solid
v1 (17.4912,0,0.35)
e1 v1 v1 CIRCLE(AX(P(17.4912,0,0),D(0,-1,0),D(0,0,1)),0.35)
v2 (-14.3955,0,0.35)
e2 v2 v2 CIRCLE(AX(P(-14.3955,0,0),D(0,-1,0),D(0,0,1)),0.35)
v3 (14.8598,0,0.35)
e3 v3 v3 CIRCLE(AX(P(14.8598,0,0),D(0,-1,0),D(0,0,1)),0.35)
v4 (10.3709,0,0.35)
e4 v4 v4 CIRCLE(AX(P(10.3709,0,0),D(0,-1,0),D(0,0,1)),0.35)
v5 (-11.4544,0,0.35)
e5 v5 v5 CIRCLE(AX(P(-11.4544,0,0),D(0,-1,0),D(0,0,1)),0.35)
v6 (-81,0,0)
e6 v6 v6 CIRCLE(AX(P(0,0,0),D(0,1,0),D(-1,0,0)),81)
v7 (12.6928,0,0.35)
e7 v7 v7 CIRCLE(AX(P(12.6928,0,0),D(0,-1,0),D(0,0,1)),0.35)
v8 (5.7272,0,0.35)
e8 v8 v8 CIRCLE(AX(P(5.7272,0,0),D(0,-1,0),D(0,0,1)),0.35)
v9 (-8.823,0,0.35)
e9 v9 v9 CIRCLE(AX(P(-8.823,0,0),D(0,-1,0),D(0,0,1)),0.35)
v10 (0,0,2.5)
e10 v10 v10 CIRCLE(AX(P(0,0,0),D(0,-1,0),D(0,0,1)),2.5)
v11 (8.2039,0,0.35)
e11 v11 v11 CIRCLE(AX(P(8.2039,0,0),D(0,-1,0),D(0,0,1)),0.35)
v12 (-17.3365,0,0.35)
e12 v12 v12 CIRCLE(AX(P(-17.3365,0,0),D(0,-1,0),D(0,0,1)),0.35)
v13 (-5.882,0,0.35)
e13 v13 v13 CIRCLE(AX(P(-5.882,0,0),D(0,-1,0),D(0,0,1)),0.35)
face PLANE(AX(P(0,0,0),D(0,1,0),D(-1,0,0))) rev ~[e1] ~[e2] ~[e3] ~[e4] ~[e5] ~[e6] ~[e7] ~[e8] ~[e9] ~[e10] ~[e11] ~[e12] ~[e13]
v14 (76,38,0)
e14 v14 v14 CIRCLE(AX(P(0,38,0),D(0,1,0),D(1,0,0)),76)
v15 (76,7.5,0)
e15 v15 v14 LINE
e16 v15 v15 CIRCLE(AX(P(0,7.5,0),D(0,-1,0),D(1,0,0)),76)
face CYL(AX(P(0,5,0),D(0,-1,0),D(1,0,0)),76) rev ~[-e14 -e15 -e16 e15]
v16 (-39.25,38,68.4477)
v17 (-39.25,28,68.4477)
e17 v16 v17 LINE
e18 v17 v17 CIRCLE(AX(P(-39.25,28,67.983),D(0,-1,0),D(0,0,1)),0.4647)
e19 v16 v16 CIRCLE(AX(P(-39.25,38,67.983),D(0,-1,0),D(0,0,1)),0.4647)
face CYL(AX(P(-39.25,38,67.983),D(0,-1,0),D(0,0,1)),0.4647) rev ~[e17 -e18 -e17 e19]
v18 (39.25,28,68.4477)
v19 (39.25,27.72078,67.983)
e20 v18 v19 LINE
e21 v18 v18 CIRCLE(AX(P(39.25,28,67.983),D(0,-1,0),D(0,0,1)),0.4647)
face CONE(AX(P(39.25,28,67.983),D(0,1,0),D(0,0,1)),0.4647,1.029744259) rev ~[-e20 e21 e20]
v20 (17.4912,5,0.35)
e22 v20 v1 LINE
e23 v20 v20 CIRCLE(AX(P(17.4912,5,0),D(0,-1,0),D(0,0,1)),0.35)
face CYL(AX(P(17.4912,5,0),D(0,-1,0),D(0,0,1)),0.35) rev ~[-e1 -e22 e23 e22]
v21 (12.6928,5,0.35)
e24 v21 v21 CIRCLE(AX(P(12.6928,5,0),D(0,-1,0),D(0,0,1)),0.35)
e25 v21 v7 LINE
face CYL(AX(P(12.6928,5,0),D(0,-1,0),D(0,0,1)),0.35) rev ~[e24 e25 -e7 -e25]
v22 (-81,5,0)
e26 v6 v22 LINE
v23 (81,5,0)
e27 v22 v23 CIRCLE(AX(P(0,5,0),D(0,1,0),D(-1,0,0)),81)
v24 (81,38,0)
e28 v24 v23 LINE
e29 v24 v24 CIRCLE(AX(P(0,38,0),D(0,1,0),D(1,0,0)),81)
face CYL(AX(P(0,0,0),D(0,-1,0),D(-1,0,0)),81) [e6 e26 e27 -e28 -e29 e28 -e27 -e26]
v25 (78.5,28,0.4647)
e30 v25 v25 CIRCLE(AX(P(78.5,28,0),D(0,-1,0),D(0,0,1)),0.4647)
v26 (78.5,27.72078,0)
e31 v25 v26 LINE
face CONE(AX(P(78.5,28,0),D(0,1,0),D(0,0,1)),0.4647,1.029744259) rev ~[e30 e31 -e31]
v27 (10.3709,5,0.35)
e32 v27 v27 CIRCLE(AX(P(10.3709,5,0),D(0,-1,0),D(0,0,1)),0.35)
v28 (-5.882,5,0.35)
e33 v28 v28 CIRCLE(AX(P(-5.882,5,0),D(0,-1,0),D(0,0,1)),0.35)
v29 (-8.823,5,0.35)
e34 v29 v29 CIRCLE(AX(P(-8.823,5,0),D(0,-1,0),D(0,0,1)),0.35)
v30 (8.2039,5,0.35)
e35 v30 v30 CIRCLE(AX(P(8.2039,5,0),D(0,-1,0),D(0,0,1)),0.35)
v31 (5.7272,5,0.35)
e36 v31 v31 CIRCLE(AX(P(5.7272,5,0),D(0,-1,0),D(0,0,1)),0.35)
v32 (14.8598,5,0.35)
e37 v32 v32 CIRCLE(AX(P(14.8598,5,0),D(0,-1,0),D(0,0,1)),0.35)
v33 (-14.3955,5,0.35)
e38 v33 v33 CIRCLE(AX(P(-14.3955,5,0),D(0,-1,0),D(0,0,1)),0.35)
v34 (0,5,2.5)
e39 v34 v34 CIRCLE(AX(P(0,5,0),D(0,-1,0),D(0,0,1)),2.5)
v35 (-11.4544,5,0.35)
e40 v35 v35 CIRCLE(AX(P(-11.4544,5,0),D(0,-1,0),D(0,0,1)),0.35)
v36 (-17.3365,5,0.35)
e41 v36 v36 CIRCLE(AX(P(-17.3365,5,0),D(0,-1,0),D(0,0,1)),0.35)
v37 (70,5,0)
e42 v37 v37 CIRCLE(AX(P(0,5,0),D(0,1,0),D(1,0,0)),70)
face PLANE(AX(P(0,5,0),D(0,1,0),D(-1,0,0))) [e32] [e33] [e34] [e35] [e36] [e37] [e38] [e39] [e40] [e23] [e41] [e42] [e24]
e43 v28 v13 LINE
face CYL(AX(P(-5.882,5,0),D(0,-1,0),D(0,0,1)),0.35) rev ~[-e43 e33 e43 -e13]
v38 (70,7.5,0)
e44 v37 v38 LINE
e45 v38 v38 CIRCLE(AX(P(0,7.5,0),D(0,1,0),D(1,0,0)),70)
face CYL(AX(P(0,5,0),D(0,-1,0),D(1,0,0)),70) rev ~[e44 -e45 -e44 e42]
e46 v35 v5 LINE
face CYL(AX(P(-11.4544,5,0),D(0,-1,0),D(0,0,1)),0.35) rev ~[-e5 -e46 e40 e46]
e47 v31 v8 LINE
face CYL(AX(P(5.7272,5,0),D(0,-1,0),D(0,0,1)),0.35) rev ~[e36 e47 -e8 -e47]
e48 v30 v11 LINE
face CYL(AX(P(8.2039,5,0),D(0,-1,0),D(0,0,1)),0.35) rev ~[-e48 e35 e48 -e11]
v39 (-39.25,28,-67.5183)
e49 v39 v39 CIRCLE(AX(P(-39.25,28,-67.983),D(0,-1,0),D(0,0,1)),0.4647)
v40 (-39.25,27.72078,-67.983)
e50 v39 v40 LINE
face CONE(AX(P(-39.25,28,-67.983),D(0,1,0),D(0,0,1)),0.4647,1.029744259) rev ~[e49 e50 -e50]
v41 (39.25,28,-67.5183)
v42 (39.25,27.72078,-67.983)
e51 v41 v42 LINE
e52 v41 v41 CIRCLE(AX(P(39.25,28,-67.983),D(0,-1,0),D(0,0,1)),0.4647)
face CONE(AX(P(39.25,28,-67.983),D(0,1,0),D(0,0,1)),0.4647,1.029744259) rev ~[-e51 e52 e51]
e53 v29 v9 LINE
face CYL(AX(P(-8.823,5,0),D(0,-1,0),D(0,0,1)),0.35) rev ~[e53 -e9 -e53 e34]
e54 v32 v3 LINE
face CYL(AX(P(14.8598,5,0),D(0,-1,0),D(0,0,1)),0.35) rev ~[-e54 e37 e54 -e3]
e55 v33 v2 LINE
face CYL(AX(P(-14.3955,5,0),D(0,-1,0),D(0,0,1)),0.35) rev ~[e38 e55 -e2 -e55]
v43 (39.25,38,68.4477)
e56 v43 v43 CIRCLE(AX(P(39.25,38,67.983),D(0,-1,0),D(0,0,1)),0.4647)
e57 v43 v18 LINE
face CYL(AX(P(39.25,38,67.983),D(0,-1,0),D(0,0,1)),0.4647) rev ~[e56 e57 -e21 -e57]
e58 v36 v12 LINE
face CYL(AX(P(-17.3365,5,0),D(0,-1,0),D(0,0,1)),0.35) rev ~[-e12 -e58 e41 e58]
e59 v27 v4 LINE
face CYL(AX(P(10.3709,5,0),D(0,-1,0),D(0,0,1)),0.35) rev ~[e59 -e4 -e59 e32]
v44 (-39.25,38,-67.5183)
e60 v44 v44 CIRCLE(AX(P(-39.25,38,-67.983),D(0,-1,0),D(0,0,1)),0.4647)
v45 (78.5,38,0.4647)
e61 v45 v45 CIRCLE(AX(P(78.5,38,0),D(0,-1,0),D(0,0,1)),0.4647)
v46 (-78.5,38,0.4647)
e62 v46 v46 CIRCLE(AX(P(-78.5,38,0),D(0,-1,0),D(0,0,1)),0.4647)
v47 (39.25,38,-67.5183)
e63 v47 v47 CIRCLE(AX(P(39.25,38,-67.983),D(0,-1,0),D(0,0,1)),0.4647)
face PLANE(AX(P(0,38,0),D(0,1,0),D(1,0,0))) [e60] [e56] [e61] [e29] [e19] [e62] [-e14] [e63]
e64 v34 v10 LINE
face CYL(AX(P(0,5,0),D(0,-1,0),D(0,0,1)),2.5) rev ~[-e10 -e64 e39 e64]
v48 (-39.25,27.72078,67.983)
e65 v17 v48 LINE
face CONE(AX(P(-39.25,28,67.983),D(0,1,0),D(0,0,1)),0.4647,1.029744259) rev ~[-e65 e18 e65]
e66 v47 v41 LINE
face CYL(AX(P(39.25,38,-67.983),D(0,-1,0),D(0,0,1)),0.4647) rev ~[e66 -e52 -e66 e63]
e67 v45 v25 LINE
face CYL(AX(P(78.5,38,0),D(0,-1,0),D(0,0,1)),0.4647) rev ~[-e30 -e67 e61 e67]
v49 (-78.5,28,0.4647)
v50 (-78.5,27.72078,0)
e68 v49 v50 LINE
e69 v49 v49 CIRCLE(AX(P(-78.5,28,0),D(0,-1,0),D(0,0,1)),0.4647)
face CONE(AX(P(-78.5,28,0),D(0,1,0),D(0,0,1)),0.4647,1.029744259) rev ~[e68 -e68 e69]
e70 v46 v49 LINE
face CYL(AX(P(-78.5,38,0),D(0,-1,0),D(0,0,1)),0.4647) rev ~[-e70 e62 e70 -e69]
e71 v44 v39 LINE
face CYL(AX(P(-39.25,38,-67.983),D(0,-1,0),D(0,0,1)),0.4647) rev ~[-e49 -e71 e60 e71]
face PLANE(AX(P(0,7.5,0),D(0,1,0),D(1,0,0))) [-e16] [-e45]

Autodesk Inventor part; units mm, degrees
ref_plane "YZ Plane" through (0, 0, 0) normal (1, 0, 0) x (0, 1, 0)
ref_plane "XZ Plane" through (0, 0, 0) normal (0, 1, 0) x (-1, 0, 0)
ref_plane "XY Plane" through (0, 0, 0) normal (0, 0, 1) x (1, 0, 0)
sketch "Skizze1" plane through (0, 0, 0) normal (0, 1, 0) x (-1, 0, 0)
  circle A0 centre (0, 0) radius 81
  dimension "d0" = 162
extrude "Extrusion1" add sketch "Skizze1" along normal blind 5
sketch "Skizze2" plane through (0, 5, 0) normal (0, 1, 0) x (1, 0, 0)
  circle A0 centre (0, 0) radius 70
  circle A1 centre (0, 0) radius 20
  circle A2 centre (0, 0) radius 81 projected
  circle A3 centre (0, 0) radius 76
  point P0 (-17.3365, 0)
  point P1 (-14.3955, 0)
  point P2 (-11.4544, 0)
  point P3 (-8.823, 0)
  point P4 (-5.882, 0)
  point P5 (5.7272, 0)
  point P6 (8.2039, 0)
  point P7 (10.3709, 0)
  point P8 (12.6928, 0)
  point P9 (14.8598, 0)
  point P10 (17.4912, 0)
  dimension "d3" = 140
  dimension "d4" = 40
  dimension "d21" = 152
hole "Bohrung1" at (0, 5, 0) direction (0, -1, 0) diameter 5 end through all
extrude "Extrusion2" add sketch "Skizze2" along normal blind 2.5 contours A2 | A3
hole "Bohrung2" at (-17.3365, 5, 0) at (-14.3955, 5, 0) at (-11.4544, 5, 0) at (-8.823, 5, 0) at (-5.882, 5, 0) at (5.7272, 5, 0) at (8.2039, 5, 0) at (10.3709, 5, 0) at (12.6928, 5, 0) at (14.8598, 5, 0) at (17.4912, 5, 0) direction (0, -1, 0) diameter 0.7 end through all
extrude "Extrusion3" add sketch "Skizze2" along normal blind 33 contours A2
sketch "Skizze3" plane through (0, 38, 0) normal (0, 1, 0) x (1, 0, 0)
  circle A0 centre (39.25, 67.983) radius 1.2 projected
  circle A1 centre (-39.25, 67.983) radius 1.2 projected
  circle A2 centre (39.25, -67.983) radius 1.2 projected
  circle A3 centre (-39.25, -67.983) radius 1.2 projected
  circle A4 centre (78.5, 0) radius 1.2 projected
  circle A5 centre (-78.5, 0) radius 1.2 projected
  point P0 (0, 0)
hole "Bohrung3" at (39.25, 38, -67.983) at (39.25, 38, 67.983) at (-39.25, 38, 67.983) at (-78.5, 38, 0) at (-39.25, 38, -67.983) at (78.5, 38, 0) direction (0, -1, 0) diameter 0.9294 depth 10 tip angle 118 thread size "M1.2x0.25" class "6H" standard "ISO Metric profile"
